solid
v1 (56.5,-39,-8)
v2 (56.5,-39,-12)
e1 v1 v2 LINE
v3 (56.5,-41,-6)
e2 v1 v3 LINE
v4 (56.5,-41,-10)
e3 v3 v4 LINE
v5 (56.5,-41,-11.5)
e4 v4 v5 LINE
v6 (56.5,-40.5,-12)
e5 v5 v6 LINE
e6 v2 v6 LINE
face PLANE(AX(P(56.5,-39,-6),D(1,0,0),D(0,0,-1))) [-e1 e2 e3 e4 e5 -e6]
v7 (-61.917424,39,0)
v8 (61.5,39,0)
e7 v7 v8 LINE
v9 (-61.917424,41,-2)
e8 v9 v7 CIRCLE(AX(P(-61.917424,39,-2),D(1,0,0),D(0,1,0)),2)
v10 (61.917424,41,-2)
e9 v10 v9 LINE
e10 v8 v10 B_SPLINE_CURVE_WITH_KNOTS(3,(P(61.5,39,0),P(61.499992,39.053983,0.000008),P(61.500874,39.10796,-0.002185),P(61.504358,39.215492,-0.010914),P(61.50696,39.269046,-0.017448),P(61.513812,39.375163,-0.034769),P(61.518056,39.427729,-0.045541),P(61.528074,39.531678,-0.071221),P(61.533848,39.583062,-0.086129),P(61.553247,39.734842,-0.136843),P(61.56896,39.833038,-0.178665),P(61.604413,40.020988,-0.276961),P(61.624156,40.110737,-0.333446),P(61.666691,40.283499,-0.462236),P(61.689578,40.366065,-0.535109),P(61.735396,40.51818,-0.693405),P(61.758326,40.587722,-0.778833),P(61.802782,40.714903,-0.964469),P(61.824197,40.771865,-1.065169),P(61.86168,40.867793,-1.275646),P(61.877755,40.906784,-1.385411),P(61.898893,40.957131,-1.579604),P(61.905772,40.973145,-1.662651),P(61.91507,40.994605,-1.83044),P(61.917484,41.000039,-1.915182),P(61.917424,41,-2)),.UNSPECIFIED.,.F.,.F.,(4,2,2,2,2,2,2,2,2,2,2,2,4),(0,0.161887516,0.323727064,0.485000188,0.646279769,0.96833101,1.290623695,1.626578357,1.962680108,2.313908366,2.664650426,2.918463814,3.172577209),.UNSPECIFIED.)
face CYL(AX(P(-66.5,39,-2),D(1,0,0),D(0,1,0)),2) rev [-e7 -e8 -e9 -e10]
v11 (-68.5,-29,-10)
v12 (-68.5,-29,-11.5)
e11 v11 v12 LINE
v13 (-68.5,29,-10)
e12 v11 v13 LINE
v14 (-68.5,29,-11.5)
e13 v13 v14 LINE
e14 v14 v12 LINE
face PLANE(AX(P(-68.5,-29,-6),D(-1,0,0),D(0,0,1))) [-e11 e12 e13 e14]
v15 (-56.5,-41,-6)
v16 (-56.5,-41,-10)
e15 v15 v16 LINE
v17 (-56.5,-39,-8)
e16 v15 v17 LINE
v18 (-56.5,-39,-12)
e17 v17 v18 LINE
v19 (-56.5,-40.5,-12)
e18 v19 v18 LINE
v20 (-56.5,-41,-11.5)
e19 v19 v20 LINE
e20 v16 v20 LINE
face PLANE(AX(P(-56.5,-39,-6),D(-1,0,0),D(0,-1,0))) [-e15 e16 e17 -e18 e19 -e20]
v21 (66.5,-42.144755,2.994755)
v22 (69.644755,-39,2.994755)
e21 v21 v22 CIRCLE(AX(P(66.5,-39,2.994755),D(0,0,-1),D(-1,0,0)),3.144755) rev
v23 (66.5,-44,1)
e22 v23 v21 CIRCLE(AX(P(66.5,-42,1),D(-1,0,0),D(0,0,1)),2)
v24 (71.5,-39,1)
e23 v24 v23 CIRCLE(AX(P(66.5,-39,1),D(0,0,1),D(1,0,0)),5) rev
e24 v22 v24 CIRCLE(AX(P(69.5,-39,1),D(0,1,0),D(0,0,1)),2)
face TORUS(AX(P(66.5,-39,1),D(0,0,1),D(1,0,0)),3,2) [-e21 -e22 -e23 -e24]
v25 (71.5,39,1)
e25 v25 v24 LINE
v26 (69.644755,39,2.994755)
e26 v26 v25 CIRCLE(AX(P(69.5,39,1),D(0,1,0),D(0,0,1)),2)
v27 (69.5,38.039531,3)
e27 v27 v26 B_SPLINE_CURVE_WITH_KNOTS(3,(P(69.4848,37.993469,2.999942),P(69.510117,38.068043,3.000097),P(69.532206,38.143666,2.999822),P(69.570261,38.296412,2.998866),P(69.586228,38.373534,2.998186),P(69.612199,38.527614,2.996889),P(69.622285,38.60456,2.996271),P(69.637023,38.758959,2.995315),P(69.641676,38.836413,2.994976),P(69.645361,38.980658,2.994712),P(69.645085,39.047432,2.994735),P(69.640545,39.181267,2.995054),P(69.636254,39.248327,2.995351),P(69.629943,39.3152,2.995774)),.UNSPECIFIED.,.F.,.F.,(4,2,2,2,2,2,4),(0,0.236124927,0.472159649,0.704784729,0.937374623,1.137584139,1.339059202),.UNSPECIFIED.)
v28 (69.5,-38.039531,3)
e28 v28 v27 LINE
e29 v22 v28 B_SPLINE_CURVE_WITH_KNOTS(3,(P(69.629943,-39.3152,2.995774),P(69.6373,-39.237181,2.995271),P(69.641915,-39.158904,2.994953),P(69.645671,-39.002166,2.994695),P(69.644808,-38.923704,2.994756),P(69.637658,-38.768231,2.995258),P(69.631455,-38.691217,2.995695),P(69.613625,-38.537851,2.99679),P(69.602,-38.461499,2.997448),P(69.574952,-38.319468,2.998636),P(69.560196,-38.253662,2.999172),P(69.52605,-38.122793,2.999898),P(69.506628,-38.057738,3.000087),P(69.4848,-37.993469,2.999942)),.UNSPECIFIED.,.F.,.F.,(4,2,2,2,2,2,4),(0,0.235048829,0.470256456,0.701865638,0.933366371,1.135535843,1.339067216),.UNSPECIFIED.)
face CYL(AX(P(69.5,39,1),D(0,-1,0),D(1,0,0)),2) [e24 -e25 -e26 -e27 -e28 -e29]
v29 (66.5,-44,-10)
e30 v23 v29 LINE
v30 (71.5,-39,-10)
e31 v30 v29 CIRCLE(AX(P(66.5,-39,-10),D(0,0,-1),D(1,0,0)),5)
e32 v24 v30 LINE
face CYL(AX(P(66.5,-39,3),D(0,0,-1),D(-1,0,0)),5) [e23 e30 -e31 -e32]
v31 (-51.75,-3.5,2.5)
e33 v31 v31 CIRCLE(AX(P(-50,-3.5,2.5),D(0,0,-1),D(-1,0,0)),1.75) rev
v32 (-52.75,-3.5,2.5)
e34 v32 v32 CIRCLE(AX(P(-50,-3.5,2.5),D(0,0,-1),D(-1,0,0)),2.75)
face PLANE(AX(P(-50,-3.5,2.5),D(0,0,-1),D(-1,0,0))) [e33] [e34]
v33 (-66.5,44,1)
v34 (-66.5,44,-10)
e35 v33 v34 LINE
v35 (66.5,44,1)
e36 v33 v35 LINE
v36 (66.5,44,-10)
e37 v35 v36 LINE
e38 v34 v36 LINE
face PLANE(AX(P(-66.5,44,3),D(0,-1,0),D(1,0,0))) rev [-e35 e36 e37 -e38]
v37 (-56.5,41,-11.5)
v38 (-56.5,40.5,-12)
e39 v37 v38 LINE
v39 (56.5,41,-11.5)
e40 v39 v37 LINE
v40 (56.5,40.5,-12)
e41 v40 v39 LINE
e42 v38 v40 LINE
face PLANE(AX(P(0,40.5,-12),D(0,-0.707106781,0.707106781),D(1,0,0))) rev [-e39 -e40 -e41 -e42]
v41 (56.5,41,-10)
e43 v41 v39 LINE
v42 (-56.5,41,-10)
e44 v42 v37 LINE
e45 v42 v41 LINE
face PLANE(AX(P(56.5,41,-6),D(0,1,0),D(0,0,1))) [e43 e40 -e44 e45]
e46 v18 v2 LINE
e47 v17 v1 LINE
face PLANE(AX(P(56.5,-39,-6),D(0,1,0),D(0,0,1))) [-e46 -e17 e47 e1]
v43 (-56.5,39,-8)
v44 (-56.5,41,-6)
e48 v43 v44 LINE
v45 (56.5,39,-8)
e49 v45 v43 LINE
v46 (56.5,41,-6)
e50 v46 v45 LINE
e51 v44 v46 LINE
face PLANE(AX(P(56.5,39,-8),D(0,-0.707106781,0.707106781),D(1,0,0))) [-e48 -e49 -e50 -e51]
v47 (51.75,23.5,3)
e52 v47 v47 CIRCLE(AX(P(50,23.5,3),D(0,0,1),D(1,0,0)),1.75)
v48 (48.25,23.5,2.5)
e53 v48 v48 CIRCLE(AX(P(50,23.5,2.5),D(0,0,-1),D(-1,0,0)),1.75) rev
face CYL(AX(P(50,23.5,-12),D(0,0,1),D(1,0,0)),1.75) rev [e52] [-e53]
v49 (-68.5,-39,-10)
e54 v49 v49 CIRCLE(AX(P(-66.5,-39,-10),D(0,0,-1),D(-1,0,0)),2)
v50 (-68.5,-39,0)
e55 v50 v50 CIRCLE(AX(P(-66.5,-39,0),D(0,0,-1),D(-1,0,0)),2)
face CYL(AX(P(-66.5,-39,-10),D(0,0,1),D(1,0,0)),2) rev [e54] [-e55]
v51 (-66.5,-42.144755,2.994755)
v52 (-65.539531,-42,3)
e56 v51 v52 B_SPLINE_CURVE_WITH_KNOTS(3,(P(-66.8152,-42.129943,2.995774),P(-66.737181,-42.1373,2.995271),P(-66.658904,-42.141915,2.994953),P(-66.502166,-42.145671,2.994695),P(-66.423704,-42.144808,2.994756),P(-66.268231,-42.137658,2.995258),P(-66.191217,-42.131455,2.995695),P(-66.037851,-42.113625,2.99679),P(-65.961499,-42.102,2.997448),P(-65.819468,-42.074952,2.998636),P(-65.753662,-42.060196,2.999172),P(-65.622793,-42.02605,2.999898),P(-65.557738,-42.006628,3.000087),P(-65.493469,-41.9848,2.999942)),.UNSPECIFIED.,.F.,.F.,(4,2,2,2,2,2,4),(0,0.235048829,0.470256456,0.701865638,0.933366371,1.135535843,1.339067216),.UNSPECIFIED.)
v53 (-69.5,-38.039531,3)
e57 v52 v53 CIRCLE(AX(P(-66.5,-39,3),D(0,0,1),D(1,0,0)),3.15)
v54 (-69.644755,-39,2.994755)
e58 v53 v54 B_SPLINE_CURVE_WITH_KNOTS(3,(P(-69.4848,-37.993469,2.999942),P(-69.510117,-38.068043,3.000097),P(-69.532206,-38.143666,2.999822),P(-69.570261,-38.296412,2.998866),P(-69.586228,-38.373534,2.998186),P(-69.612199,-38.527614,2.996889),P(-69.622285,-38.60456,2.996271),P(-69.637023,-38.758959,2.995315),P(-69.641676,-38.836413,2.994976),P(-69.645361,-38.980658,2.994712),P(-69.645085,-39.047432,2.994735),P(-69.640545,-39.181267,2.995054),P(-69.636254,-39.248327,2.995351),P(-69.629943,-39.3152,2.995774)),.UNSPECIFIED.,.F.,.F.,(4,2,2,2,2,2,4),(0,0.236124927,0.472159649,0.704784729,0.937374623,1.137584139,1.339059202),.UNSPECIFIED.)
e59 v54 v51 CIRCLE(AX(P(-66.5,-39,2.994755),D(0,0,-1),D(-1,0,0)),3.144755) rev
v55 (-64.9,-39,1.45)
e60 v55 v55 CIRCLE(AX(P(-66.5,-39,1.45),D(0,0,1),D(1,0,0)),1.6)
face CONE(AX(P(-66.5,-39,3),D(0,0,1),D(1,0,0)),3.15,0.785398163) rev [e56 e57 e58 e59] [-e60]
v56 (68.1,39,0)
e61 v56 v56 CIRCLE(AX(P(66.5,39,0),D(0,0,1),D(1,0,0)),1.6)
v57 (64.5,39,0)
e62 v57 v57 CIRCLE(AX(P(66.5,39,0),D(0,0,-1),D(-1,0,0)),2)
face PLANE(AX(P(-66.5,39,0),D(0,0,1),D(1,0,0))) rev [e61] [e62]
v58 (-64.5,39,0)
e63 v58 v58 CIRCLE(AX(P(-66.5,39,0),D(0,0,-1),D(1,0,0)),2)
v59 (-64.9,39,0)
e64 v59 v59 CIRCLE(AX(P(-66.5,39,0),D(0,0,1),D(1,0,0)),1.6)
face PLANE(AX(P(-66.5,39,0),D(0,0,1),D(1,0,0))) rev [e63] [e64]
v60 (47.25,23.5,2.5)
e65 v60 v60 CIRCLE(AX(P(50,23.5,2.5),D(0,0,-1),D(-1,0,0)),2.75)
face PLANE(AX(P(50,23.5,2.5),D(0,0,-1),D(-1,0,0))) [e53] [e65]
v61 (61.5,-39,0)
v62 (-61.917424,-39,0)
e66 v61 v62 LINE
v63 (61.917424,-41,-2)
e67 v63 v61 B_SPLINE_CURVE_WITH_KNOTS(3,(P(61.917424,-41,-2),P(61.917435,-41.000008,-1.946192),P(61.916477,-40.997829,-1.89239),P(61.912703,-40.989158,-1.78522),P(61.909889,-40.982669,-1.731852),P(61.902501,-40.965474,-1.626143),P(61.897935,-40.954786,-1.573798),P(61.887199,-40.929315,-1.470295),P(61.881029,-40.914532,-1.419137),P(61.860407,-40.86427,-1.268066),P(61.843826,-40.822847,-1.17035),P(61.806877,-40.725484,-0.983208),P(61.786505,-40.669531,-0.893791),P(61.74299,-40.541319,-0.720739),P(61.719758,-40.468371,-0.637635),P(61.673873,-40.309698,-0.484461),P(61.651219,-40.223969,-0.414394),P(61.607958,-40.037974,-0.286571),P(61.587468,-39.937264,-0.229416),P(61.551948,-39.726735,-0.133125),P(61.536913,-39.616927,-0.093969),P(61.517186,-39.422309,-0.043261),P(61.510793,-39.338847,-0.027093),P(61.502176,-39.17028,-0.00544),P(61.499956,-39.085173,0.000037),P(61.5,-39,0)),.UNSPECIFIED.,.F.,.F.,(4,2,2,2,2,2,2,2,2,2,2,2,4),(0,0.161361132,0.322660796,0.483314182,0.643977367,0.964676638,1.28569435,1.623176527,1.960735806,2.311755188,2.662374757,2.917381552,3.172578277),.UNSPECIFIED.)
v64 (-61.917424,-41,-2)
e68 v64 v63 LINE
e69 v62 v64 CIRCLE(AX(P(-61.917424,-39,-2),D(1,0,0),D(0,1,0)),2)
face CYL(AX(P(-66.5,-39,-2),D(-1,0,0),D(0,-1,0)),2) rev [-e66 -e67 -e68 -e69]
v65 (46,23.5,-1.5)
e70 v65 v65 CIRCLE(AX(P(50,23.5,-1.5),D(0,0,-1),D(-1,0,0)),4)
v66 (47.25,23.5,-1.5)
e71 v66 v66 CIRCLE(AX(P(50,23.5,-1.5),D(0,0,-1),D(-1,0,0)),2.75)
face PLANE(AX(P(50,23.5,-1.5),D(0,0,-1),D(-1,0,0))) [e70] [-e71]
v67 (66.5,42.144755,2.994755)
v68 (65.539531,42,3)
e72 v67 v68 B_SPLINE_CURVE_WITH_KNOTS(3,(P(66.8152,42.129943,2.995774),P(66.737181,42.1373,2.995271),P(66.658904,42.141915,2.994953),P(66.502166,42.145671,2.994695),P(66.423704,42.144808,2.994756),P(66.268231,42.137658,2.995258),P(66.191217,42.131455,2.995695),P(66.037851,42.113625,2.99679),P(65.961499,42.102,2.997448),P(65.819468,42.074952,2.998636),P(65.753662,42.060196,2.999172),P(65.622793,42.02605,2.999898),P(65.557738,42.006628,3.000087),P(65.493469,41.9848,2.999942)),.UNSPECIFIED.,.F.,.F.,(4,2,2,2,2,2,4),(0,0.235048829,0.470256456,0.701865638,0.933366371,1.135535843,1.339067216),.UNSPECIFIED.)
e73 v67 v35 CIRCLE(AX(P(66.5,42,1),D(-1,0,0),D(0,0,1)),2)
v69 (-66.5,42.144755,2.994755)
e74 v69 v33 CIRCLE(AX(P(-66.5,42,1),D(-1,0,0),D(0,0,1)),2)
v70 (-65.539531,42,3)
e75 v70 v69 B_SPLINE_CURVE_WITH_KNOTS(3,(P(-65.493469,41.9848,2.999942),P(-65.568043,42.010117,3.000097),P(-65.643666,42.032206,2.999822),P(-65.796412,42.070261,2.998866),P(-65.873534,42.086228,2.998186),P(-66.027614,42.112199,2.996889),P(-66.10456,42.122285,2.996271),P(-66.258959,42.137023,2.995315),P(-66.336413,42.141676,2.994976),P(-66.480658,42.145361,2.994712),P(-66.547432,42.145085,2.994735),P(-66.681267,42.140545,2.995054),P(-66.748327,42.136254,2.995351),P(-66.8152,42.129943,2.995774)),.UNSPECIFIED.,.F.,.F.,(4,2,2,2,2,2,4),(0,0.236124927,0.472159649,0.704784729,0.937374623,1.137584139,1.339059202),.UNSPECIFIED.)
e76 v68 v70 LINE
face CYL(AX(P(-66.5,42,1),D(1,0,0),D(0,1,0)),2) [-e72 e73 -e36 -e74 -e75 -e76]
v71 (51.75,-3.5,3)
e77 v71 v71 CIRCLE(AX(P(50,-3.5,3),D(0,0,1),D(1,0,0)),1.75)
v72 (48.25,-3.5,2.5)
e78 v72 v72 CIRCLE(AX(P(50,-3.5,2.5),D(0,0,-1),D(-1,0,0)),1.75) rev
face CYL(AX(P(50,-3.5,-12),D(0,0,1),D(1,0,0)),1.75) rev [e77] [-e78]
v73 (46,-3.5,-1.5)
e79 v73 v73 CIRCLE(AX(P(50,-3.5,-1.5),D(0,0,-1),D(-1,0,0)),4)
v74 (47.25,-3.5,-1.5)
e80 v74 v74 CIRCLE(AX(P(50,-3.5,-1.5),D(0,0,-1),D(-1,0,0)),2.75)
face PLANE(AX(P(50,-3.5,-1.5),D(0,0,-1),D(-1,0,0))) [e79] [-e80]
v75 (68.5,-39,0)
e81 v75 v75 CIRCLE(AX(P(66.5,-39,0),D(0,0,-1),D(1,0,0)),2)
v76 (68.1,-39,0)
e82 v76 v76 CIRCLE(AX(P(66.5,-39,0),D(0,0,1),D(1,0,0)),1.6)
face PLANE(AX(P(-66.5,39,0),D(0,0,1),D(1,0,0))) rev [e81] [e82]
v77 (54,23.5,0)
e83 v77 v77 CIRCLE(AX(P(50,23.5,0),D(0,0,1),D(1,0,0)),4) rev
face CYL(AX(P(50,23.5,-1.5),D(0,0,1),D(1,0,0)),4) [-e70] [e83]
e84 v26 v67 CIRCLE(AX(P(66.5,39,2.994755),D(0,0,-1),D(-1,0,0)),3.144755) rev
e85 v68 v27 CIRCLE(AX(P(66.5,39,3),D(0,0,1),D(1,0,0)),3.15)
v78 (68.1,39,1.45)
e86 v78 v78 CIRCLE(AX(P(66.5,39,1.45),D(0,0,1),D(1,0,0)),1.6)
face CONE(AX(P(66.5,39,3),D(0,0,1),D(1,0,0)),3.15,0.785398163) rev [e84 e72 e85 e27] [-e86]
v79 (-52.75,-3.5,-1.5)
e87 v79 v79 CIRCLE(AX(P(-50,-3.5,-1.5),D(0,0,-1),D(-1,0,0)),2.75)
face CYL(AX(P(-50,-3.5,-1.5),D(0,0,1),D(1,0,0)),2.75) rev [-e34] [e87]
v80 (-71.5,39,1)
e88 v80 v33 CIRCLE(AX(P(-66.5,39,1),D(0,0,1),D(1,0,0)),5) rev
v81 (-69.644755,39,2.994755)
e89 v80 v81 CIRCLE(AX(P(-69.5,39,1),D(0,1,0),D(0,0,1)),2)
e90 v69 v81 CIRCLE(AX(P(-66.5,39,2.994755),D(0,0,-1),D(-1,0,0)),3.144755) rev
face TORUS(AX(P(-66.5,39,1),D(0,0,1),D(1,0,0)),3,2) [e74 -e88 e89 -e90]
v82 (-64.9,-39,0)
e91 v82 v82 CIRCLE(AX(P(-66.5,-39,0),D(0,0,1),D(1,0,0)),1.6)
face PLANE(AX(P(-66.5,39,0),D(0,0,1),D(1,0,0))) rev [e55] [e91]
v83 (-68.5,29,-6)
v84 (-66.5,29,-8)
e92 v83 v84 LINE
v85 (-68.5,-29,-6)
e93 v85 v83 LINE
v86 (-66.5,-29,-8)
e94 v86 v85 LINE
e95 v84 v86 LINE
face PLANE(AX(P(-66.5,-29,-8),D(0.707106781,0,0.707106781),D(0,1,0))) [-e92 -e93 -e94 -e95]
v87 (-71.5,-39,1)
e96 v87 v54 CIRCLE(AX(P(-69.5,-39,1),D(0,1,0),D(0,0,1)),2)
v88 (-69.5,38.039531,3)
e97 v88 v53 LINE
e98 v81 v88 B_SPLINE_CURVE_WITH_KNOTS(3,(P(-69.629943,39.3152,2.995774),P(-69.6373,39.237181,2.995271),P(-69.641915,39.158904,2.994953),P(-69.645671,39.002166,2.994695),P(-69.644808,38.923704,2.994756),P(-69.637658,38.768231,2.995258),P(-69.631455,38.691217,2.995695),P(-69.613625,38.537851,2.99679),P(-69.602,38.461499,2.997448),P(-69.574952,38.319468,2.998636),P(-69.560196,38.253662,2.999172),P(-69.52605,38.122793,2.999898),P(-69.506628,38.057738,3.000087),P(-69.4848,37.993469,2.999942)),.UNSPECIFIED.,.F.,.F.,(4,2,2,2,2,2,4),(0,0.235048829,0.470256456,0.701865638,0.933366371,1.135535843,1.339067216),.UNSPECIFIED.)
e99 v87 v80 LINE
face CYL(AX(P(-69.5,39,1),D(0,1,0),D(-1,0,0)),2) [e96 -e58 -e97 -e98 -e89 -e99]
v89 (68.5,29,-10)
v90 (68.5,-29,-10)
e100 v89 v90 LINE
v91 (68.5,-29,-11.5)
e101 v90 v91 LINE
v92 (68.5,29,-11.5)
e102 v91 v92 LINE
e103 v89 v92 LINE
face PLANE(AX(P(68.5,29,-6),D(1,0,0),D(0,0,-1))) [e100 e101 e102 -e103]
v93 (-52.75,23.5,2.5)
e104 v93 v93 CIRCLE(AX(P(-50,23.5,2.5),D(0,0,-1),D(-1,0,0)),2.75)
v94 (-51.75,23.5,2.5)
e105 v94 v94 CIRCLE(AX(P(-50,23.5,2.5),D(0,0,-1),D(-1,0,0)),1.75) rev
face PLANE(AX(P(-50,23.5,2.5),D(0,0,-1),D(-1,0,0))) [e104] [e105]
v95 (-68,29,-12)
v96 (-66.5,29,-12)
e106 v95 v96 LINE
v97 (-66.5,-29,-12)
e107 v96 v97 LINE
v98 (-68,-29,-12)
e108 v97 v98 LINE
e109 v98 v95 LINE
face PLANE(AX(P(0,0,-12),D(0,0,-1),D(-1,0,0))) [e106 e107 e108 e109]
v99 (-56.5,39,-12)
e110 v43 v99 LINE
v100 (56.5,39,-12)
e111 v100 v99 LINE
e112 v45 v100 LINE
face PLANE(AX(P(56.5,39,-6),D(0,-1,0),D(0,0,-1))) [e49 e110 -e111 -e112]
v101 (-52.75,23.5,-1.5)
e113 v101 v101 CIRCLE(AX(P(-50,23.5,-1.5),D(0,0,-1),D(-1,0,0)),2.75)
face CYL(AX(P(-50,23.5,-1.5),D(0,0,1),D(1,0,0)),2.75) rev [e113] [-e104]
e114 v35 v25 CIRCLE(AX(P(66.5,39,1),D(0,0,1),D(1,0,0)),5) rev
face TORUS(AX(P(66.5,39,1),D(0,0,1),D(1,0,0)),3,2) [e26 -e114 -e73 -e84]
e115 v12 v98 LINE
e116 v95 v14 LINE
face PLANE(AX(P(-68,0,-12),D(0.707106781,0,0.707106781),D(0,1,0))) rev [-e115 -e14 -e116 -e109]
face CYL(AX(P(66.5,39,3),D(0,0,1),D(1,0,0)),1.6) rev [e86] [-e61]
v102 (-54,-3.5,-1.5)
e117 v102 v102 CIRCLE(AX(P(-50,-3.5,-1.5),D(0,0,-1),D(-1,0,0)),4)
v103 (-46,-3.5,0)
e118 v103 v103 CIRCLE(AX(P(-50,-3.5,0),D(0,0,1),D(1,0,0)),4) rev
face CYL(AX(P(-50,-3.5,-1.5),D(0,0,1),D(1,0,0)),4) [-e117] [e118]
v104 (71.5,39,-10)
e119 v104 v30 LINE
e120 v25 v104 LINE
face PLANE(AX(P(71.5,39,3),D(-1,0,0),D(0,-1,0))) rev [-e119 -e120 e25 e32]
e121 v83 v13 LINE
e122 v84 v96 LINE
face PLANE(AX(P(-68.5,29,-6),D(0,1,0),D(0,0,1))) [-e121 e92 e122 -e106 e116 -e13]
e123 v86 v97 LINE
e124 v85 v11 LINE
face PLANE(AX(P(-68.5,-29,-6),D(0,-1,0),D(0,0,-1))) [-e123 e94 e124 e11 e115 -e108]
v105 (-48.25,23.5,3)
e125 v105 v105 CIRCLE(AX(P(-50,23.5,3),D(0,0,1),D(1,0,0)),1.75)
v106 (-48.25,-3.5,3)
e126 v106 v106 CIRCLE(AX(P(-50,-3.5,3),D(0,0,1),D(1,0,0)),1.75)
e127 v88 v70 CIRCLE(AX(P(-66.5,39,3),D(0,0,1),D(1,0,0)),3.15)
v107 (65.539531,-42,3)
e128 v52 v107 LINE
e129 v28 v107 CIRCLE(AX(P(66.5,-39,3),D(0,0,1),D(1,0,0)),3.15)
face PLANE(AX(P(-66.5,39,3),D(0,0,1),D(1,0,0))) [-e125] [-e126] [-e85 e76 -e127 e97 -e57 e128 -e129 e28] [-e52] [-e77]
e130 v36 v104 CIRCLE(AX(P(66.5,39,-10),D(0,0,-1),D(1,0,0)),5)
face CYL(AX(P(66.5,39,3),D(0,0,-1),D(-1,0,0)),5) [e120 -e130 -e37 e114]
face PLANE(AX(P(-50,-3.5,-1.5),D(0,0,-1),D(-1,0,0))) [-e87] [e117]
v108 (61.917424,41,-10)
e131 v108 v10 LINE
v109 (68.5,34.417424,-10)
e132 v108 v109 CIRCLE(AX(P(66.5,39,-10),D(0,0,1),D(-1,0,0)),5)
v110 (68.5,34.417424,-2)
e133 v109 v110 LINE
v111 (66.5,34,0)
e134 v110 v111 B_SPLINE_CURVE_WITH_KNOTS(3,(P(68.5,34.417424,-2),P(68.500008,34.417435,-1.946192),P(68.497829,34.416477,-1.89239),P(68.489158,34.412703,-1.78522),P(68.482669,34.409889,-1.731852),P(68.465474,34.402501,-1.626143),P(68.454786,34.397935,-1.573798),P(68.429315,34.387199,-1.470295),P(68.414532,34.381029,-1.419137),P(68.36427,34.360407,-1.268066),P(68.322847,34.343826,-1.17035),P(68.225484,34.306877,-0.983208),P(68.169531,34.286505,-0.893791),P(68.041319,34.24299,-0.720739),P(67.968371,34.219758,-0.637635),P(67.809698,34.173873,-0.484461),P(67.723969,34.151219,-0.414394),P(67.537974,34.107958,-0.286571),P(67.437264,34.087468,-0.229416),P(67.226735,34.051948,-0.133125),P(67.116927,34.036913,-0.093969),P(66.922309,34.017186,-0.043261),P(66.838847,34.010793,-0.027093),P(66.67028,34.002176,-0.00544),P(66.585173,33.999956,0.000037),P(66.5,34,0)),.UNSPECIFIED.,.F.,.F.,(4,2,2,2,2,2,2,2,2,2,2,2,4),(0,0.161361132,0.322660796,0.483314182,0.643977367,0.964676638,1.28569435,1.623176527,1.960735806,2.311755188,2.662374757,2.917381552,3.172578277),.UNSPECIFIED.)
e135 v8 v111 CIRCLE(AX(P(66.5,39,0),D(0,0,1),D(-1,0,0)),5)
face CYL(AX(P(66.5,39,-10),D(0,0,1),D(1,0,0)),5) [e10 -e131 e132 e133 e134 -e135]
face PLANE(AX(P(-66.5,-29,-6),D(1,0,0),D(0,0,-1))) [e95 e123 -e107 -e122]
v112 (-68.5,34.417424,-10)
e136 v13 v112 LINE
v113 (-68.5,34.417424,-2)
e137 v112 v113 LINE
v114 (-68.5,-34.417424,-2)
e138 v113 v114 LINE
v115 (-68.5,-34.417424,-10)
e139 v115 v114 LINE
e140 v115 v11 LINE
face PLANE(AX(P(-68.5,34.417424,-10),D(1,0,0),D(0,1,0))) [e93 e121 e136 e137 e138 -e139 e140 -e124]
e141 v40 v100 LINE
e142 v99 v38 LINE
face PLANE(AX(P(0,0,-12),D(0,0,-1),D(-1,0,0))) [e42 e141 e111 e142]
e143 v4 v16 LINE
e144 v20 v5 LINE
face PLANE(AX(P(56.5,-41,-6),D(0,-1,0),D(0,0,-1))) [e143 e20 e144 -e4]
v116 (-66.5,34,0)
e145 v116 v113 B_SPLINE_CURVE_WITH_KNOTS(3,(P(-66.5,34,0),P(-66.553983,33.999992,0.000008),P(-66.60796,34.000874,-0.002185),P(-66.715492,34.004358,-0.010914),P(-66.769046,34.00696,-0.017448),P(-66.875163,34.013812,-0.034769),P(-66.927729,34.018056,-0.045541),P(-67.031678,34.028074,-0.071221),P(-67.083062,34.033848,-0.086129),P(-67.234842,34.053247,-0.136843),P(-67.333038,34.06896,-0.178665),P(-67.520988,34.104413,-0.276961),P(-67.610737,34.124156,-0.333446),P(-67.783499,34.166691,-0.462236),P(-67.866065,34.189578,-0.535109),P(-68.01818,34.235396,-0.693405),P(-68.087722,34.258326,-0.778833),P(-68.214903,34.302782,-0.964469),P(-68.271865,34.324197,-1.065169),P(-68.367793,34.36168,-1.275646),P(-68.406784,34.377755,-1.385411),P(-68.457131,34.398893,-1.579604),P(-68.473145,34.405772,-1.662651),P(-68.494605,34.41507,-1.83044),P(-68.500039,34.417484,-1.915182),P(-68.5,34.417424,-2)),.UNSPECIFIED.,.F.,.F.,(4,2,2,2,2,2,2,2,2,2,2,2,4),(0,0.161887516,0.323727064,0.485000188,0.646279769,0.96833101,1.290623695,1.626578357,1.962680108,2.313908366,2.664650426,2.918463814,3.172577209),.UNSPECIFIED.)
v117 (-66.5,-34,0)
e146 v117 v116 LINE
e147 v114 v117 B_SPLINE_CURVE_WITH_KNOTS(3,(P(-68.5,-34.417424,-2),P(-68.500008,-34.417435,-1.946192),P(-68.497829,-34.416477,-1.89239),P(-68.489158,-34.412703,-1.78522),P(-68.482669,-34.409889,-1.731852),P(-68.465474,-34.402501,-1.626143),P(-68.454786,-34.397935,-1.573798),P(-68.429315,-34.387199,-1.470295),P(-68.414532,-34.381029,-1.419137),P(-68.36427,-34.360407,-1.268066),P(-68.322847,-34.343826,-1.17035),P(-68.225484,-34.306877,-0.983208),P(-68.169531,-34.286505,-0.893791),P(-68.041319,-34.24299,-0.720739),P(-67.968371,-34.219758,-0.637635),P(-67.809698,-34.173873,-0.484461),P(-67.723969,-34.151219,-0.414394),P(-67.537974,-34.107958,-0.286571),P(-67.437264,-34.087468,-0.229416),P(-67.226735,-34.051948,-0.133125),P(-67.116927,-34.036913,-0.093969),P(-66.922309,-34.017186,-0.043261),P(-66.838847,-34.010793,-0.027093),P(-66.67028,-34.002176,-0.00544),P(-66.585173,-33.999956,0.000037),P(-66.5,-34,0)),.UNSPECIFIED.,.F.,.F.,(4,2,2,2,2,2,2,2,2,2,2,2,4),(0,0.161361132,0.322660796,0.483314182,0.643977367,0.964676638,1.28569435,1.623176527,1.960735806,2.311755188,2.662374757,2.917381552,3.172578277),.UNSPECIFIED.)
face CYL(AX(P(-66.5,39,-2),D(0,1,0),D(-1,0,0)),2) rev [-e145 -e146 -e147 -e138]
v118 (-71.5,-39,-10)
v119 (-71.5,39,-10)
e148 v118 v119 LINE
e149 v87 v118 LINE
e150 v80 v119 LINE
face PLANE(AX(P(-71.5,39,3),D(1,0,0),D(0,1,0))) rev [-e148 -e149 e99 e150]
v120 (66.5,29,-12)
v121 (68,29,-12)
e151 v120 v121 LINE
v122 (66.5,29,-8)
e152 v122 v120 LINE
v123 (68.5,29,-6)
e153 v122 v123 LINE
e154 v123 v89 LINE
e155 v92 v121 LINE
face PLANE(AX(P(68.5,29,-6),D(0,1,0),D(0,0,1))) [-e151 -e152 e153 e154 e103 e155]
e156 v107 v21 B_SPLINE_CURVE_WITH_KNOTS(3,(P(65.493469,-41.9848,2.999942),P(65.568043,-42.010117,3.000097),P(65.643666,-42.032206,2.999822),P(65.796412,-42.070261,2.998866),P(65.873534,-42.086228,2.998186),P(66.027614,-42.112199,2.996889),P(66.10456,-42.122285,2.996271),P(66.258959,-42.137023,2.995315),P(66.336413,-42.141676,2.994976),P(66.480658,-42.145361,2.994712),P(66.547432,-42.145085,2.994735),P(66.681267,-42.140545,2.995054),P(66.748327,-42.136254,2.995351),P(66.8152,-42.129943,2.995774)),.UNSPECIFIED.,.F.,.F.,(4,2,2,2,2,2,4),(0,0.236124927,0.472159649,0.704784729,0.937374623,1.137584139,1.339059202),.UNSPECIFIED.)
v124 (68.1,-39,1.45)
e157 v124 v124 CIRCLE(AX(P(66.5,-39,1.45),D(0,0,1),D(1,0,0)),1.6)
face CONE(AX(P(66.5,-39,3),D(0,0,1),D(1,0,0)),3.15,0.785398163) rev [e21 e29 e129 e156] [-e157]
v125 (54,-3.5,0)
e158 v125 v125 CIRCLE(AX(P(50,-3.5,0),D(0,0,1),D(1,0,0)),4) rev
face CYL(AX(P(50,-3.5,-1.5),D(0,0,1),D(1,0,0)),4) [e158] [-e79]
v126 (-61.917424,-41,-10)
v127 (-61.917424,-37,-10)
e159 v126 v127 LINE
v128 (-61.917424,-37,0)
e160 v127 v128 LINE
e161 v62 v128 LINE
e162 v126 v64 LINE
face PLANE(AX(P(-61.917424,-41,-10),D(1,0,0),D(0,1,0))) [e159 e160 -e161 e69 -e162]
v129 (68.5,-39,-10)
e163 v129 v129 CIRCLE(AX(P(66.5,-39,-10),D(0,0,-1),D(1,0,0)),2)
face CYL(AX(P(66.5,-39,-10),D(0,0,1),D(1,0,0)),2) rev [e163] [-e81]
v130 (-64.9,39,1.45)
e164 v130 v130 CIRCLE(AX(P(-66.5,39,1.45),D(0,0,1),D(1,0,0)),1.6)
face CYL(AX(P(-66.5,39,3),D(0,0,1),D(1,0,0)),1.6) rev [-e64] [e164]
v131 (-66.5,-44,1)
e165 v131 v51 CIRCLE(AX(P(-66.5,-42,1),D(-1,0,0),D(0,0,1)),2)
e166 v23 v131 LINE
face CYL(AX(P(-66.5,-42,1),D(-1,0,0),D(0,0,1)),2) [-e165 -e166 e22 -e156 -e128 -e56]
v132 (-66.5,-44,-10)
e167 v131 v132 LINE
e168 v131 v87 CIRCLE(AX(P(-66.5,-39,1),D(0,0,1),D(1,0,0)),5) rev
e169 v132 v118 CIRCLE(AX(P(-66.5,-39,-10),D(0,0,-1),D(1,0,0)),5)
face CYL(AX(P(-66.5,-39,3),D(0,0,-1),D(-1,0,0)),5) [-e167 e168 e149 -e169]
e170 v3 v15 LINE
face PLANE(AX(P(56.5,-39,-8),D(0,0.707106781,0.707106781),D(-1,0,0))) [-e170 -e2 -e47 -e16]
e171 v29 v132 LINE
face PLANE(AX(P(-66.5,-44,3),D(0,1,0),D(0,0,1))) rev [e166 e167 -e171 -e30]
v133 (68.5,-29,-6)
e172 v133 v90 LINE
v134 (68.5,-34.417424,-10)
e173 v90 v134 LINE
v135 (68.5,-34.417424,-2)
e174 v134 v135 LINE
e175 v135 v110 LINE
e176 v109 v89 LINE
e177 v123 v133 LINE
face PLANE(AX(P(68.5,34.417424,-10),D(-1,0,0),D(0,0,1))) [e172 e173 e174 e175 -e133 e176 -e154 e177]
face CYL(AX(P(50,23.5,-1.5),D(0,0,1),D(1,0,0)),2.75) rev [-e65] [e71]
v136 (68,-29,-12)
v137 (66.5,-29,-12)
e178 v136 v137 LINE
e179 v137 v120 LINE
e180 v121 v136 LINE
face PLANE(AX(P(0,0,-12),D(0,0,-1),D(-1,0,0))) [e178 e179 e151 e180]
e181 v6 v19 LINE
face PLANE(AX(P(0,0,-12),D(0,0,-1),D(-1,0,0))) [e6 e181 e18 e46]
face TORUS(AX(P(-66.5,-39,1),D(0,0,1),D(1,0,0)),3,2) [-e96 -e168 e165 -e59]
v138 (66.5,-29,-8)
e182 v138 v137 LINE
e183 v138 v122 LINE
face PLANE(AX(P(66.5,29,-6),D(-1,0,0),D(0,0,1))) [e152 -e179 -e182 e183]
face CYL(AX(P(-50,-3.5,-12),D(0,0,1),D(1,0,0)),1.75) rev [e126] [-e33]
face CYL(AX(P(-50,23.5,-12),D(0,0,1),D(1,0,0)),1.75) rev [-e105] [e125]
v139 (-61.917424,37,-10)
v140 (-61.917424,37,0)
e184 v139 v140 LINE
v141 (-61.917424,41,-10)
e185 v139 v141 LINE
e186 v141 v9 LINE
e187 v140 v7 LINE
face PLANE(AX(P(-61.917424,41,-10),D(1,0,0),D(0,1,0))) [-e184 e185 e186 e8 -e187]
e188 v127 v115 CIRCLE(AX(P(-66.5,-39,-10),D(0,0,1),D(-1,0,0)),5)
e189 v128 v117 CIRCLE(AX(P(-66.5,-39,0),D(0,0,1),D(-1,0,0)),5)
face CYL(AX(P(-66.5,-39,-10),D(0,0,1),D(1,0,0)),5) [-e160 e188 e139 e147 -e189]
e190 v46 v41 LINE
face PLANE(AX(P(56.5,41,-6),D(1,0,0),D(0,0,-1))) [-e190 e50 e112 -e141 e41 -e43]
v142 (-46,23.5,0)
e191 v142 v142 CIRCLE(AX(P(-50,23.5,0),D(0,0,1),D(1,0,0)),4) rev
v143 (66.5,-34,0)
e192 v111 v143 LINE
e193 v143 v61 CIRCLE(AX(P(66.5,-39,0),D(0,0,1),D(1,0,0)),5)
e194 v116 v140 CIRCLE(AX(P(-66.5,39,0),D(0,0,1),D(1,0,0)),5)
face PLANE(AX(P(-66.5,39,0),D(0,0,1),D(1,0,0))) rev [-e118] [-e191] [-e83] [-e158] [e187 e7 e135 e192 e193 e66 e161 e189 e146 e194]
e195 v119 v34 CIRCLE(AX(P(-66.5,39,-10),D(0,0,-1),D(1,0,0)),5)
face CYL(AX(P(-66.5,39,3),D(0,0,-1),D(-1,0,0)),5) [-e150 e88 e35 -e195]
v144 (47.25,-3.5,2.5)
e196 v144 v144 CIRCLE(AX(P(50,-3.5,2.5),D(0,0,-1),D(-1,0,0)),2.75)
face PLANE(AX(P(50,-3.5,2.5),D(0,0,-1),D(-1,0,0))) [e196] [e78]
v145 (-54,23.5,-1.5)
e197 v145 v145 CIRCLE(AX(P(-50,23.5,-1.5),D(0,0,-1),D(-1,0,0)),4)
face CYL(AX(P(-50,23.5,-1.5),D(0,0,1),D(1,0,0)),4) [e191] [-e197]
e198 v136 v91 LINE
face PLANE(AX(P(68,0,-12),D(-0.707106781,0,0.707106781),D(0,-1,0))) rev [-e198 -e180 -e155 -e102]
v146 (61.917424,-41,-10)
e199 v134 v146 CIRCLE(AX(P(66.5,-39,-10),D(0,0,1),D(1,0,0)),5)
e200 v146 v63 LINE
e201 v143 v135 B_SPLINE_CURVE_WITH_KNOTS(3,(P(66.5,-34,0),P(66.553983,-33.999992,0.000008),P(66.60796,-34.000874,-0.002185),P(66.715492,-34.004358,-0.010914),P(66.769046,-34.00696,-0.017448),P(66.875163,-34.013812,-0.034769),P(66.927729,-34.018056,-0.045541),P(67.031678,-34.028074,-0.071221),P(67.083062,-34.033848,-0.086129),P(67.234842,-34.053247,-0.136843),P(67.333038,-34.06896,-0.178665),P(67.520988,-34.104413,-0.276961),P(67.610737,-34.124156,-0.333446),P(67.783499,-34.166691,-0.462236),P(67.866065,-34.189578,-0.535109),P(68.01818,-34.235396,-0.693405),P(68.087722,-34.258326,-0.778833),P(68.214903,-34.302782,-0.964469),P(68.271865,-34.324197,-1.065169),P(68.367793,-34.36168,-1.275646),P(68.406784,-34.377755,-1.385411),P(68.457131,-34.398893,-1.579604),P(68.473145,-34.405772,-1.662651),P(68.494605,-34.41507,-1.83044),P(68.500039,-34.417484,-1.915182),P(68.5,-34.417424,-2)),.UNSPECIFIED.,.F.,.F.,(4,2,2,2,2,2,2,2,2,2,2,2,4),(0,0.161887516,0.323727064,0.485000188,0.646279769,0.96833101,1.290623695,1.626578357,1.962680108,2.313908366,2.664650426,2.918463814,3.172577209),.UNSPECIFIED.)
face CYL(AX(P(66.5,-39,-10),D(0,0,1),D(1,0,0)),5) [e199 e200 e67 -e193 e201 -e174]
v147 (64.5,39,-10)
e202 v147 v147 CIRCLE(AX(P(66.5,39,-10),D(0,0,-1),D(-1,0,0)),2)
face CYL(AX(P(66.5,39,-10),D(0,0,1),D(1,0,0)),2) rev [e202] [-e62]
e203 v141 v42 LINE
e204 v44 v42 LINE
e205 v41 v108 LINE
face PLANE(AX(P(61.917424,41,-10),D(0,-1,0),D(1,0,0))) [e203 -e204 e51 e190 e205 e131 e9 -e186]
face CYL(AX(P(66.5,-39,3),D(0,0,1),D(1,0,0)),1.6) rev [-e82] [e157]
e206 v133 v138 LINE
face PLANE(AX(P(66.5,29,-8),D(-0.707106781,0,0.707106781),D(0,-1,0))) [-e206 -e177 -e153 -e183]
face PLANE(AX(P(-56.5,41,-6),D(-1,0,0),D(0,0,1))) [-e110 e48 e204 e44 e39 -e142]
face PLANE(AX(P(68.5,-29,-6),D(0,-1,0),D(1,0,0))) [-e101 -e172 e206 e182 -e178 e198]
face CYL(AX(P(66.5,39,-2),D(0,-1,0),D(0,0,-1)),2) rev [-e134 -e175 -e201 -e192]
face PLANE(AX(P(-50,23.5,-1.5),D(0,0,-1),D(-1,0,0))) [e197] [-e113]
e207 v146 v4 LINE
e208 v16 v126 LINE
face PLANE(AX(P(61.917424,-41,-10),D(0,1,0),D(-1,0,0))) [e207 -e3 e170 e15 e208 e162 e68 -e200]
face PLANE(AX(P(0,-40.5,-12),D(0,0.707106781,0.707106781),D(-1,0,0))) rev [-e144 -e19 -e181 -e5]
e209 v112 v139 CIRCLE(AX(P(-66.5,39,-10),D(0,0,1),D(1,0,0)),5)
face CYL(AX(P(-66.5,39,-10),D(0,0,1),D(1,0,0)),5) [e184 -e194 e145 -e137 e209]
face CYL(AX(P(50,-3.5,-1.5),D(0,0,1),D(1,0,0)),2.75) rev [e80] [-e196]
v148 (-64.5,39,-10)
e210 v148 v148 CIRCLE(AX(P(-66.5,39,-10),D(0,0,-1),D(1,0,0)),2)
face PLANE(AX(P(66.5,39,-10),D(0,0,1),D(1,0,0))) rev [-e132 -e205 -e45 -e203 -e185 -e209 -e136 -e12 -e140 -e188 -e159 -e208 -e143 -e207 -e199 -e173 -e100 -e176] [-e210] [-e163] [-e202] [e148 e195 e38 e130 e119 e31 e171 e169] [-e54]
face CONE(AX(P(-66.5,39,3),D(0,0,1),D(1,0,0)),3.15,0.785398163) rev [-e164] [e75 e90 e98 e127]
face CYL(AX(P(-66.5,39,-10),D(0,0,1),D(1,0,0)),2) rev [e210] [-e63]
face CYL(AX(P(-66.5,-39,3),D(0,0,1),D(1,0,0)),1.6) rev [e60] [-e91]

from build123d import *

# Parameters (mm, degrees)
BOSS_EXTRUDE1_DEPTH                             = 3
BOSS_EXTRUDE2_START                             = 10
SKETCH2_R                                       = 2
BOSS_EXTRUDE2_DEPTH                             = 10
FILLET2_R                                       = 2
CSK_FOR_M3_FLAT_HEAD_MACHINE_SCREW1_D           = 3.2
CSK_FOR_M3_FLAT_HEAD_MACHINE_SCREW1_CSINK_D     = 6.3
CSK_FOR_M3_FLAT_HEAD_MACHINE_SCREW1_CSINK_ANGLE = 90
BOSS_EXTRUDE3_DEPTH                             = 2
BOSS_EXTRUDE3_DEPTH_BACK                        = 4
SKETCH5_W                                       = 113
SKETCH5_H                                       = 2
SKETCH5_W_2                                     = 2
SKETCH5_H_2                                     = 58
CHAMFER1_SIZE                                   = 2
CHAMFER2_SIZE                                   = 0.5
SKETCH6_R                                       = 1.75
CUT_EXTRUDE1_DEPTH                              = 86.283351383
SKETCH7_R                                       = 4
SKETCH7_R_2                                     = 2.75
BOSS_EXTRUDE4_DEPTH                             = 1.5
CUT_EXTRUDE2_START                              = -4
SKETCH8_R                                       = 2.75
CUT_EXTRUDE2_DEPTH                              = 4


with BuildPart() as part:
    # Sketch1 → Boss-Extrude1 (new body)
    with BuildSketch(Plane.XY):
        with BuildLine():
            Line((-66.5, 44), (66.5, 44))
            ThreePointArc((66.5, 44), (70.035533906, 42.535533906), (71.5, 39))
            Line((71.5, 39), (71.5, -39))
            ThreePointArc((71.5, -39), (70.035533906, -42.535533906), (66.5, -44))
            Line((66.5, -44), (-66.5, -44))
            ThreePointArc((-66.5, -44), (-70.035533906, -42.535533906), (-71.5, -39))
            Line((-71.5, -39), (-71.5, 39))
            ThreePointArc((-71.5, 39), (-70.035533906, 42.535533906), (-66.5, 44))
        make_face()
    extrude(amount=BOSS_EXTRUDE1_DEPTH)

    # Sketch2 → Boss-Extrude2 (add)
    with BuildSketch(Plane(origin=(0, 0, 0), x_dir=(-1, 0, 0), z_dir=(0, 0, -1)).offset(BOSS_EXTRUDE2_START)):
        with BuildLine():
            Line((-66.5, 44), (66.5, 44))
            ThreePointArc((66.5, 44), (70.035533906, 42.535533906), (71.5, 39))
            Line((71.5, 39), (71.5, -39))
            ThreePointArc((71.5, -39), (70.035533906, -42.535533906), (66.5, -44))
            Line((66.5, -44), (-66.5, -44))
            ThreePointArc((-66.5, -44), (-70.035533906, -42.535533906), (-71.5, -39))
            Line((-71.5, -39), (-71.5, 39))
            ThreePointArc((-71.5, 39), (-70.035533906, 42.535533906), (-66.5, 44))
        make_face()
        with Locations((-66.5, 39)):
            Circle(SKETCH2_R, mode=Mode.SUBTRACT)
        with Locations(Location((66.5, 39, 0), (0, 0, 180))):
            Circle(SKETCH2_R, mode=Mode.SUBTRACT)
        with Locations((66.5, -39)):
            Circle(SKETCH2_R, mode=Mode.SUBTRACT)
        with Locations(Location((-66.5, -39, 0), (0, 0, 180))):
            Circle(SKETCH2_R, mode=Mode.SUBTRACT)
        with BuildLine():
            Line((-61.917424305, 41), (61.917424305, 41))
            Line((61.917424305, 41), (61.917424305, 37))
            ThreePointArc((61.917424305, 37), (64.673843213, 34.345416088), (68.5, 34.417424305))
            Line((68.5, 34.417424305), (68.5, -34.417424305))
            ThreePointArc((68.5, -34.417424305), (64.673843213, -34.345416088), (61.917424305, -37))
            Line((61.917424305, -37), (61.917424305, -41))
            Line((61.917424305, -41), (-61.917424305, -41))
            ThreePointArc((-61.917424305, -41), (-62.964466094, -35.464466094), (-68.5, -34.417424305))
            Line((-68.5, -34.417424305), (-68.5, 34.417424305))
            ThreePointArc((-68.5, 34.417424305), (-62.964466094, 35.464466094), (-61.917424305, 41))
        make_face(mode=Mode.SUBTRACT)
    extrude(amount=-BOSS_EXTRUDE2_DEPTH)

    # Fillet2
    fillet2_edges = [part.edges().sort_by_distance(p)[0] for p in [
        (-70.035533906, -42.535533906, 3),
        (0, -44, 3),
        (70.035533906, -42.535533906, 3),
        (71.5, 0, 3),
        (70.035533906, 42.535533906, 3),
        (0, 44, 3),
        (0, 41, 0),
        (68.5, 0, 0),
        (0, -41, 0),
        (-68.5, 0, 0),
        (-70.035533906, 42.535533906, 3),
        (-71.5, 0, 3),
    ]]
    fillet(fillet2_edges, radius=FILLET2_R)

    # CSK for M3 Flat Head Machine Screw1 (through all)
    with Locations(Plane.XY.offset(3)):
        with Locations((-66.5, 39), (66.5, 39), (66.5, -39), (-66.5, -39)):
            CounterSinkHole(CSK_FOR_M3_FLAT_HEAD_MACHINE_SCREW1_D / 2, CSK_FOR_M3_FLAT_HEAD_MACHINE_SCREW1_CSINK_D / 2, counter_sink_angle=CSK_FOR_M3_FLAT_HEAD_MACHINE_SCREW1_CSINK_ANGLE)

    # Sketch5 → Boss-Extrude3 (add, two sides: drawn at the far end of the back side and taken through both)
    with BuildSketch(Plane(origin=(0, 0, -10), x_dir=(-1, 0, 0), z_dir=(0, 0, -1)).offset(-BOSS_EXTRUDE3_DEPTH_BACK)):
        with Locations((0, 40)):
            Rectangle(SKETCH5_W, SKETCH5_H)
        with Locations((-67.5, 0)):
            Rectangle(SKETCH5_W_2, SKETCH5_H_2)
        with Locations((0, -40)):
            Rectangle(SKETCH5_W, SKETCH5_H)
        with Locations((67.5, 0)):
            Rectangle(SKETCH5_W_2, SKETCH5_H_2)
    extrude(amount=BOSS_EXTRUDE3_DEPTH + BOSS_EXTRUDE3_DEPTH_BACK)

    # Chamfer1
    chamfer1_edges = [part.edges().sort_by_distance(p)[0] for p in [
        (0, -39, -6),
        (-66.5, 0, -6),
        (66.5, 0, -6),
        (0, 39, -6),
    ]]
    chamfer(chamfer1_edges, length=CHAMFER1_SIZE - 0.0001)  # a hair under: the kernel refuses the full size

    # Chamfer2
    chamfer2_edges = [part.edges().sort_by_distance(p)[0] for p in [
        (0, 41, -12),
        (68.5, 0, -12),
        (0, -41, -12),
        (-68.5, 0, -12),
    ]]
    chamfer(chamfer2_edges, length=CHAMFER2_SIZE)

    # Sketch6 → Cut-Extrude1 (cut, through all)
    with BuildSketch(Plane.XY.offset(3)):
        with Locations((-50, 23.5)):
            Circle(SKETCH6_R)
        with Locations((-50, -3.5)):
            Circle(SKETCH6_R)
        with Locations((50, -3.5)):
            Circle(SKETCH6_R)
        with Locations((50, 23.5)):
            Circle(SKETCH6_R)
    extrude(amount=-CUT_EXTRUDE1_DEPTH, mode=Mode.SUBTRACT)

    # Sketch7 → Boss-Extrude4 (add)
    # profile 1 of 4: a face of its own
    with BuildSketch(Plane(origin=(0, 0, 0), x_dir=(-1, 0, 0), z_dir=(0, 0, -1))):
        with Locations(Location((-50, 23.5, 0), (0, 0, 180))):
            Circle(SKETCH7_R)
        with Locations((-50, 23.5)):
            Circle(SKETCH7_R_2, mode=Mode.SUBTRACT)
    # profile 2 of 4: a face of its own
    with BuildSketch(Plane(origin=(0, 0, 0), x_dir=(-1, 0, 0), z_dir=(0, 0, -1))):
        with Locations(Location((-50, -3.5, 0), (0, 0, 180))):
            Circle(SKETCH7_R)
        with Locations((-50, -3.5)):
            Circle(SKETCH7_R_2, mode=Mode.SUBTRACT)
    # profile 3 of 4: a face of its own
    with BuildSketch(Plane(origin=(0, 0, 0), x_dir=(-1, 0, 0), z_dir=(0, 0, -1))):
        with Locations(Location((50, -3.5, 0), (0, 0, 180))):
            Circle(SKETCH7_R)
        with Locations((50, -3.5)):
            Circle(SKETCH7_R_2, mode=Mode.SUBTRACT)
    # profile 4 of 4: a face of its own
    with BuildSketch(Plane(origin=(0, 0, 0), x_dir=(-1, 0, 0), z_dir=(0, 0, -1))):
        with Locations(Location((50, 23.5, 0), (0, 0, 180))):
            Circle(SKETCH7_R)
        with Locations((50, 23.5)):
            Circle(SKETCH7_R_2, mode=Mode.SUBTRACT)
    extrude(amount=BOSS_EXTRUDE4_DEPTH)

    # Sketch8 → Cut-Extrude2 (cut)
    with BuildSketch(Plane(origin=(0, 0, -1.5), x_dir=(-1, 0, 0), z_dir=(0, 0, -1)).offset(CUT_EXTRUDE2_START)):
        with Locations((-50, 23.5)):
            Circle(SKETCH8_R)
        with Locations((-50, -3.5)):
            Circle(SKETCH8_R)
        with Locations((50, -3.5)):
            Circle(SKETCH8_R)
        with Locations((50, 23.5)):
            Circle(SKETCH8_R)
    extrude(amount=CUT_EXTRUDE2_DEPTH, mode=Mode.SUBTRACT)


solid = part.part
